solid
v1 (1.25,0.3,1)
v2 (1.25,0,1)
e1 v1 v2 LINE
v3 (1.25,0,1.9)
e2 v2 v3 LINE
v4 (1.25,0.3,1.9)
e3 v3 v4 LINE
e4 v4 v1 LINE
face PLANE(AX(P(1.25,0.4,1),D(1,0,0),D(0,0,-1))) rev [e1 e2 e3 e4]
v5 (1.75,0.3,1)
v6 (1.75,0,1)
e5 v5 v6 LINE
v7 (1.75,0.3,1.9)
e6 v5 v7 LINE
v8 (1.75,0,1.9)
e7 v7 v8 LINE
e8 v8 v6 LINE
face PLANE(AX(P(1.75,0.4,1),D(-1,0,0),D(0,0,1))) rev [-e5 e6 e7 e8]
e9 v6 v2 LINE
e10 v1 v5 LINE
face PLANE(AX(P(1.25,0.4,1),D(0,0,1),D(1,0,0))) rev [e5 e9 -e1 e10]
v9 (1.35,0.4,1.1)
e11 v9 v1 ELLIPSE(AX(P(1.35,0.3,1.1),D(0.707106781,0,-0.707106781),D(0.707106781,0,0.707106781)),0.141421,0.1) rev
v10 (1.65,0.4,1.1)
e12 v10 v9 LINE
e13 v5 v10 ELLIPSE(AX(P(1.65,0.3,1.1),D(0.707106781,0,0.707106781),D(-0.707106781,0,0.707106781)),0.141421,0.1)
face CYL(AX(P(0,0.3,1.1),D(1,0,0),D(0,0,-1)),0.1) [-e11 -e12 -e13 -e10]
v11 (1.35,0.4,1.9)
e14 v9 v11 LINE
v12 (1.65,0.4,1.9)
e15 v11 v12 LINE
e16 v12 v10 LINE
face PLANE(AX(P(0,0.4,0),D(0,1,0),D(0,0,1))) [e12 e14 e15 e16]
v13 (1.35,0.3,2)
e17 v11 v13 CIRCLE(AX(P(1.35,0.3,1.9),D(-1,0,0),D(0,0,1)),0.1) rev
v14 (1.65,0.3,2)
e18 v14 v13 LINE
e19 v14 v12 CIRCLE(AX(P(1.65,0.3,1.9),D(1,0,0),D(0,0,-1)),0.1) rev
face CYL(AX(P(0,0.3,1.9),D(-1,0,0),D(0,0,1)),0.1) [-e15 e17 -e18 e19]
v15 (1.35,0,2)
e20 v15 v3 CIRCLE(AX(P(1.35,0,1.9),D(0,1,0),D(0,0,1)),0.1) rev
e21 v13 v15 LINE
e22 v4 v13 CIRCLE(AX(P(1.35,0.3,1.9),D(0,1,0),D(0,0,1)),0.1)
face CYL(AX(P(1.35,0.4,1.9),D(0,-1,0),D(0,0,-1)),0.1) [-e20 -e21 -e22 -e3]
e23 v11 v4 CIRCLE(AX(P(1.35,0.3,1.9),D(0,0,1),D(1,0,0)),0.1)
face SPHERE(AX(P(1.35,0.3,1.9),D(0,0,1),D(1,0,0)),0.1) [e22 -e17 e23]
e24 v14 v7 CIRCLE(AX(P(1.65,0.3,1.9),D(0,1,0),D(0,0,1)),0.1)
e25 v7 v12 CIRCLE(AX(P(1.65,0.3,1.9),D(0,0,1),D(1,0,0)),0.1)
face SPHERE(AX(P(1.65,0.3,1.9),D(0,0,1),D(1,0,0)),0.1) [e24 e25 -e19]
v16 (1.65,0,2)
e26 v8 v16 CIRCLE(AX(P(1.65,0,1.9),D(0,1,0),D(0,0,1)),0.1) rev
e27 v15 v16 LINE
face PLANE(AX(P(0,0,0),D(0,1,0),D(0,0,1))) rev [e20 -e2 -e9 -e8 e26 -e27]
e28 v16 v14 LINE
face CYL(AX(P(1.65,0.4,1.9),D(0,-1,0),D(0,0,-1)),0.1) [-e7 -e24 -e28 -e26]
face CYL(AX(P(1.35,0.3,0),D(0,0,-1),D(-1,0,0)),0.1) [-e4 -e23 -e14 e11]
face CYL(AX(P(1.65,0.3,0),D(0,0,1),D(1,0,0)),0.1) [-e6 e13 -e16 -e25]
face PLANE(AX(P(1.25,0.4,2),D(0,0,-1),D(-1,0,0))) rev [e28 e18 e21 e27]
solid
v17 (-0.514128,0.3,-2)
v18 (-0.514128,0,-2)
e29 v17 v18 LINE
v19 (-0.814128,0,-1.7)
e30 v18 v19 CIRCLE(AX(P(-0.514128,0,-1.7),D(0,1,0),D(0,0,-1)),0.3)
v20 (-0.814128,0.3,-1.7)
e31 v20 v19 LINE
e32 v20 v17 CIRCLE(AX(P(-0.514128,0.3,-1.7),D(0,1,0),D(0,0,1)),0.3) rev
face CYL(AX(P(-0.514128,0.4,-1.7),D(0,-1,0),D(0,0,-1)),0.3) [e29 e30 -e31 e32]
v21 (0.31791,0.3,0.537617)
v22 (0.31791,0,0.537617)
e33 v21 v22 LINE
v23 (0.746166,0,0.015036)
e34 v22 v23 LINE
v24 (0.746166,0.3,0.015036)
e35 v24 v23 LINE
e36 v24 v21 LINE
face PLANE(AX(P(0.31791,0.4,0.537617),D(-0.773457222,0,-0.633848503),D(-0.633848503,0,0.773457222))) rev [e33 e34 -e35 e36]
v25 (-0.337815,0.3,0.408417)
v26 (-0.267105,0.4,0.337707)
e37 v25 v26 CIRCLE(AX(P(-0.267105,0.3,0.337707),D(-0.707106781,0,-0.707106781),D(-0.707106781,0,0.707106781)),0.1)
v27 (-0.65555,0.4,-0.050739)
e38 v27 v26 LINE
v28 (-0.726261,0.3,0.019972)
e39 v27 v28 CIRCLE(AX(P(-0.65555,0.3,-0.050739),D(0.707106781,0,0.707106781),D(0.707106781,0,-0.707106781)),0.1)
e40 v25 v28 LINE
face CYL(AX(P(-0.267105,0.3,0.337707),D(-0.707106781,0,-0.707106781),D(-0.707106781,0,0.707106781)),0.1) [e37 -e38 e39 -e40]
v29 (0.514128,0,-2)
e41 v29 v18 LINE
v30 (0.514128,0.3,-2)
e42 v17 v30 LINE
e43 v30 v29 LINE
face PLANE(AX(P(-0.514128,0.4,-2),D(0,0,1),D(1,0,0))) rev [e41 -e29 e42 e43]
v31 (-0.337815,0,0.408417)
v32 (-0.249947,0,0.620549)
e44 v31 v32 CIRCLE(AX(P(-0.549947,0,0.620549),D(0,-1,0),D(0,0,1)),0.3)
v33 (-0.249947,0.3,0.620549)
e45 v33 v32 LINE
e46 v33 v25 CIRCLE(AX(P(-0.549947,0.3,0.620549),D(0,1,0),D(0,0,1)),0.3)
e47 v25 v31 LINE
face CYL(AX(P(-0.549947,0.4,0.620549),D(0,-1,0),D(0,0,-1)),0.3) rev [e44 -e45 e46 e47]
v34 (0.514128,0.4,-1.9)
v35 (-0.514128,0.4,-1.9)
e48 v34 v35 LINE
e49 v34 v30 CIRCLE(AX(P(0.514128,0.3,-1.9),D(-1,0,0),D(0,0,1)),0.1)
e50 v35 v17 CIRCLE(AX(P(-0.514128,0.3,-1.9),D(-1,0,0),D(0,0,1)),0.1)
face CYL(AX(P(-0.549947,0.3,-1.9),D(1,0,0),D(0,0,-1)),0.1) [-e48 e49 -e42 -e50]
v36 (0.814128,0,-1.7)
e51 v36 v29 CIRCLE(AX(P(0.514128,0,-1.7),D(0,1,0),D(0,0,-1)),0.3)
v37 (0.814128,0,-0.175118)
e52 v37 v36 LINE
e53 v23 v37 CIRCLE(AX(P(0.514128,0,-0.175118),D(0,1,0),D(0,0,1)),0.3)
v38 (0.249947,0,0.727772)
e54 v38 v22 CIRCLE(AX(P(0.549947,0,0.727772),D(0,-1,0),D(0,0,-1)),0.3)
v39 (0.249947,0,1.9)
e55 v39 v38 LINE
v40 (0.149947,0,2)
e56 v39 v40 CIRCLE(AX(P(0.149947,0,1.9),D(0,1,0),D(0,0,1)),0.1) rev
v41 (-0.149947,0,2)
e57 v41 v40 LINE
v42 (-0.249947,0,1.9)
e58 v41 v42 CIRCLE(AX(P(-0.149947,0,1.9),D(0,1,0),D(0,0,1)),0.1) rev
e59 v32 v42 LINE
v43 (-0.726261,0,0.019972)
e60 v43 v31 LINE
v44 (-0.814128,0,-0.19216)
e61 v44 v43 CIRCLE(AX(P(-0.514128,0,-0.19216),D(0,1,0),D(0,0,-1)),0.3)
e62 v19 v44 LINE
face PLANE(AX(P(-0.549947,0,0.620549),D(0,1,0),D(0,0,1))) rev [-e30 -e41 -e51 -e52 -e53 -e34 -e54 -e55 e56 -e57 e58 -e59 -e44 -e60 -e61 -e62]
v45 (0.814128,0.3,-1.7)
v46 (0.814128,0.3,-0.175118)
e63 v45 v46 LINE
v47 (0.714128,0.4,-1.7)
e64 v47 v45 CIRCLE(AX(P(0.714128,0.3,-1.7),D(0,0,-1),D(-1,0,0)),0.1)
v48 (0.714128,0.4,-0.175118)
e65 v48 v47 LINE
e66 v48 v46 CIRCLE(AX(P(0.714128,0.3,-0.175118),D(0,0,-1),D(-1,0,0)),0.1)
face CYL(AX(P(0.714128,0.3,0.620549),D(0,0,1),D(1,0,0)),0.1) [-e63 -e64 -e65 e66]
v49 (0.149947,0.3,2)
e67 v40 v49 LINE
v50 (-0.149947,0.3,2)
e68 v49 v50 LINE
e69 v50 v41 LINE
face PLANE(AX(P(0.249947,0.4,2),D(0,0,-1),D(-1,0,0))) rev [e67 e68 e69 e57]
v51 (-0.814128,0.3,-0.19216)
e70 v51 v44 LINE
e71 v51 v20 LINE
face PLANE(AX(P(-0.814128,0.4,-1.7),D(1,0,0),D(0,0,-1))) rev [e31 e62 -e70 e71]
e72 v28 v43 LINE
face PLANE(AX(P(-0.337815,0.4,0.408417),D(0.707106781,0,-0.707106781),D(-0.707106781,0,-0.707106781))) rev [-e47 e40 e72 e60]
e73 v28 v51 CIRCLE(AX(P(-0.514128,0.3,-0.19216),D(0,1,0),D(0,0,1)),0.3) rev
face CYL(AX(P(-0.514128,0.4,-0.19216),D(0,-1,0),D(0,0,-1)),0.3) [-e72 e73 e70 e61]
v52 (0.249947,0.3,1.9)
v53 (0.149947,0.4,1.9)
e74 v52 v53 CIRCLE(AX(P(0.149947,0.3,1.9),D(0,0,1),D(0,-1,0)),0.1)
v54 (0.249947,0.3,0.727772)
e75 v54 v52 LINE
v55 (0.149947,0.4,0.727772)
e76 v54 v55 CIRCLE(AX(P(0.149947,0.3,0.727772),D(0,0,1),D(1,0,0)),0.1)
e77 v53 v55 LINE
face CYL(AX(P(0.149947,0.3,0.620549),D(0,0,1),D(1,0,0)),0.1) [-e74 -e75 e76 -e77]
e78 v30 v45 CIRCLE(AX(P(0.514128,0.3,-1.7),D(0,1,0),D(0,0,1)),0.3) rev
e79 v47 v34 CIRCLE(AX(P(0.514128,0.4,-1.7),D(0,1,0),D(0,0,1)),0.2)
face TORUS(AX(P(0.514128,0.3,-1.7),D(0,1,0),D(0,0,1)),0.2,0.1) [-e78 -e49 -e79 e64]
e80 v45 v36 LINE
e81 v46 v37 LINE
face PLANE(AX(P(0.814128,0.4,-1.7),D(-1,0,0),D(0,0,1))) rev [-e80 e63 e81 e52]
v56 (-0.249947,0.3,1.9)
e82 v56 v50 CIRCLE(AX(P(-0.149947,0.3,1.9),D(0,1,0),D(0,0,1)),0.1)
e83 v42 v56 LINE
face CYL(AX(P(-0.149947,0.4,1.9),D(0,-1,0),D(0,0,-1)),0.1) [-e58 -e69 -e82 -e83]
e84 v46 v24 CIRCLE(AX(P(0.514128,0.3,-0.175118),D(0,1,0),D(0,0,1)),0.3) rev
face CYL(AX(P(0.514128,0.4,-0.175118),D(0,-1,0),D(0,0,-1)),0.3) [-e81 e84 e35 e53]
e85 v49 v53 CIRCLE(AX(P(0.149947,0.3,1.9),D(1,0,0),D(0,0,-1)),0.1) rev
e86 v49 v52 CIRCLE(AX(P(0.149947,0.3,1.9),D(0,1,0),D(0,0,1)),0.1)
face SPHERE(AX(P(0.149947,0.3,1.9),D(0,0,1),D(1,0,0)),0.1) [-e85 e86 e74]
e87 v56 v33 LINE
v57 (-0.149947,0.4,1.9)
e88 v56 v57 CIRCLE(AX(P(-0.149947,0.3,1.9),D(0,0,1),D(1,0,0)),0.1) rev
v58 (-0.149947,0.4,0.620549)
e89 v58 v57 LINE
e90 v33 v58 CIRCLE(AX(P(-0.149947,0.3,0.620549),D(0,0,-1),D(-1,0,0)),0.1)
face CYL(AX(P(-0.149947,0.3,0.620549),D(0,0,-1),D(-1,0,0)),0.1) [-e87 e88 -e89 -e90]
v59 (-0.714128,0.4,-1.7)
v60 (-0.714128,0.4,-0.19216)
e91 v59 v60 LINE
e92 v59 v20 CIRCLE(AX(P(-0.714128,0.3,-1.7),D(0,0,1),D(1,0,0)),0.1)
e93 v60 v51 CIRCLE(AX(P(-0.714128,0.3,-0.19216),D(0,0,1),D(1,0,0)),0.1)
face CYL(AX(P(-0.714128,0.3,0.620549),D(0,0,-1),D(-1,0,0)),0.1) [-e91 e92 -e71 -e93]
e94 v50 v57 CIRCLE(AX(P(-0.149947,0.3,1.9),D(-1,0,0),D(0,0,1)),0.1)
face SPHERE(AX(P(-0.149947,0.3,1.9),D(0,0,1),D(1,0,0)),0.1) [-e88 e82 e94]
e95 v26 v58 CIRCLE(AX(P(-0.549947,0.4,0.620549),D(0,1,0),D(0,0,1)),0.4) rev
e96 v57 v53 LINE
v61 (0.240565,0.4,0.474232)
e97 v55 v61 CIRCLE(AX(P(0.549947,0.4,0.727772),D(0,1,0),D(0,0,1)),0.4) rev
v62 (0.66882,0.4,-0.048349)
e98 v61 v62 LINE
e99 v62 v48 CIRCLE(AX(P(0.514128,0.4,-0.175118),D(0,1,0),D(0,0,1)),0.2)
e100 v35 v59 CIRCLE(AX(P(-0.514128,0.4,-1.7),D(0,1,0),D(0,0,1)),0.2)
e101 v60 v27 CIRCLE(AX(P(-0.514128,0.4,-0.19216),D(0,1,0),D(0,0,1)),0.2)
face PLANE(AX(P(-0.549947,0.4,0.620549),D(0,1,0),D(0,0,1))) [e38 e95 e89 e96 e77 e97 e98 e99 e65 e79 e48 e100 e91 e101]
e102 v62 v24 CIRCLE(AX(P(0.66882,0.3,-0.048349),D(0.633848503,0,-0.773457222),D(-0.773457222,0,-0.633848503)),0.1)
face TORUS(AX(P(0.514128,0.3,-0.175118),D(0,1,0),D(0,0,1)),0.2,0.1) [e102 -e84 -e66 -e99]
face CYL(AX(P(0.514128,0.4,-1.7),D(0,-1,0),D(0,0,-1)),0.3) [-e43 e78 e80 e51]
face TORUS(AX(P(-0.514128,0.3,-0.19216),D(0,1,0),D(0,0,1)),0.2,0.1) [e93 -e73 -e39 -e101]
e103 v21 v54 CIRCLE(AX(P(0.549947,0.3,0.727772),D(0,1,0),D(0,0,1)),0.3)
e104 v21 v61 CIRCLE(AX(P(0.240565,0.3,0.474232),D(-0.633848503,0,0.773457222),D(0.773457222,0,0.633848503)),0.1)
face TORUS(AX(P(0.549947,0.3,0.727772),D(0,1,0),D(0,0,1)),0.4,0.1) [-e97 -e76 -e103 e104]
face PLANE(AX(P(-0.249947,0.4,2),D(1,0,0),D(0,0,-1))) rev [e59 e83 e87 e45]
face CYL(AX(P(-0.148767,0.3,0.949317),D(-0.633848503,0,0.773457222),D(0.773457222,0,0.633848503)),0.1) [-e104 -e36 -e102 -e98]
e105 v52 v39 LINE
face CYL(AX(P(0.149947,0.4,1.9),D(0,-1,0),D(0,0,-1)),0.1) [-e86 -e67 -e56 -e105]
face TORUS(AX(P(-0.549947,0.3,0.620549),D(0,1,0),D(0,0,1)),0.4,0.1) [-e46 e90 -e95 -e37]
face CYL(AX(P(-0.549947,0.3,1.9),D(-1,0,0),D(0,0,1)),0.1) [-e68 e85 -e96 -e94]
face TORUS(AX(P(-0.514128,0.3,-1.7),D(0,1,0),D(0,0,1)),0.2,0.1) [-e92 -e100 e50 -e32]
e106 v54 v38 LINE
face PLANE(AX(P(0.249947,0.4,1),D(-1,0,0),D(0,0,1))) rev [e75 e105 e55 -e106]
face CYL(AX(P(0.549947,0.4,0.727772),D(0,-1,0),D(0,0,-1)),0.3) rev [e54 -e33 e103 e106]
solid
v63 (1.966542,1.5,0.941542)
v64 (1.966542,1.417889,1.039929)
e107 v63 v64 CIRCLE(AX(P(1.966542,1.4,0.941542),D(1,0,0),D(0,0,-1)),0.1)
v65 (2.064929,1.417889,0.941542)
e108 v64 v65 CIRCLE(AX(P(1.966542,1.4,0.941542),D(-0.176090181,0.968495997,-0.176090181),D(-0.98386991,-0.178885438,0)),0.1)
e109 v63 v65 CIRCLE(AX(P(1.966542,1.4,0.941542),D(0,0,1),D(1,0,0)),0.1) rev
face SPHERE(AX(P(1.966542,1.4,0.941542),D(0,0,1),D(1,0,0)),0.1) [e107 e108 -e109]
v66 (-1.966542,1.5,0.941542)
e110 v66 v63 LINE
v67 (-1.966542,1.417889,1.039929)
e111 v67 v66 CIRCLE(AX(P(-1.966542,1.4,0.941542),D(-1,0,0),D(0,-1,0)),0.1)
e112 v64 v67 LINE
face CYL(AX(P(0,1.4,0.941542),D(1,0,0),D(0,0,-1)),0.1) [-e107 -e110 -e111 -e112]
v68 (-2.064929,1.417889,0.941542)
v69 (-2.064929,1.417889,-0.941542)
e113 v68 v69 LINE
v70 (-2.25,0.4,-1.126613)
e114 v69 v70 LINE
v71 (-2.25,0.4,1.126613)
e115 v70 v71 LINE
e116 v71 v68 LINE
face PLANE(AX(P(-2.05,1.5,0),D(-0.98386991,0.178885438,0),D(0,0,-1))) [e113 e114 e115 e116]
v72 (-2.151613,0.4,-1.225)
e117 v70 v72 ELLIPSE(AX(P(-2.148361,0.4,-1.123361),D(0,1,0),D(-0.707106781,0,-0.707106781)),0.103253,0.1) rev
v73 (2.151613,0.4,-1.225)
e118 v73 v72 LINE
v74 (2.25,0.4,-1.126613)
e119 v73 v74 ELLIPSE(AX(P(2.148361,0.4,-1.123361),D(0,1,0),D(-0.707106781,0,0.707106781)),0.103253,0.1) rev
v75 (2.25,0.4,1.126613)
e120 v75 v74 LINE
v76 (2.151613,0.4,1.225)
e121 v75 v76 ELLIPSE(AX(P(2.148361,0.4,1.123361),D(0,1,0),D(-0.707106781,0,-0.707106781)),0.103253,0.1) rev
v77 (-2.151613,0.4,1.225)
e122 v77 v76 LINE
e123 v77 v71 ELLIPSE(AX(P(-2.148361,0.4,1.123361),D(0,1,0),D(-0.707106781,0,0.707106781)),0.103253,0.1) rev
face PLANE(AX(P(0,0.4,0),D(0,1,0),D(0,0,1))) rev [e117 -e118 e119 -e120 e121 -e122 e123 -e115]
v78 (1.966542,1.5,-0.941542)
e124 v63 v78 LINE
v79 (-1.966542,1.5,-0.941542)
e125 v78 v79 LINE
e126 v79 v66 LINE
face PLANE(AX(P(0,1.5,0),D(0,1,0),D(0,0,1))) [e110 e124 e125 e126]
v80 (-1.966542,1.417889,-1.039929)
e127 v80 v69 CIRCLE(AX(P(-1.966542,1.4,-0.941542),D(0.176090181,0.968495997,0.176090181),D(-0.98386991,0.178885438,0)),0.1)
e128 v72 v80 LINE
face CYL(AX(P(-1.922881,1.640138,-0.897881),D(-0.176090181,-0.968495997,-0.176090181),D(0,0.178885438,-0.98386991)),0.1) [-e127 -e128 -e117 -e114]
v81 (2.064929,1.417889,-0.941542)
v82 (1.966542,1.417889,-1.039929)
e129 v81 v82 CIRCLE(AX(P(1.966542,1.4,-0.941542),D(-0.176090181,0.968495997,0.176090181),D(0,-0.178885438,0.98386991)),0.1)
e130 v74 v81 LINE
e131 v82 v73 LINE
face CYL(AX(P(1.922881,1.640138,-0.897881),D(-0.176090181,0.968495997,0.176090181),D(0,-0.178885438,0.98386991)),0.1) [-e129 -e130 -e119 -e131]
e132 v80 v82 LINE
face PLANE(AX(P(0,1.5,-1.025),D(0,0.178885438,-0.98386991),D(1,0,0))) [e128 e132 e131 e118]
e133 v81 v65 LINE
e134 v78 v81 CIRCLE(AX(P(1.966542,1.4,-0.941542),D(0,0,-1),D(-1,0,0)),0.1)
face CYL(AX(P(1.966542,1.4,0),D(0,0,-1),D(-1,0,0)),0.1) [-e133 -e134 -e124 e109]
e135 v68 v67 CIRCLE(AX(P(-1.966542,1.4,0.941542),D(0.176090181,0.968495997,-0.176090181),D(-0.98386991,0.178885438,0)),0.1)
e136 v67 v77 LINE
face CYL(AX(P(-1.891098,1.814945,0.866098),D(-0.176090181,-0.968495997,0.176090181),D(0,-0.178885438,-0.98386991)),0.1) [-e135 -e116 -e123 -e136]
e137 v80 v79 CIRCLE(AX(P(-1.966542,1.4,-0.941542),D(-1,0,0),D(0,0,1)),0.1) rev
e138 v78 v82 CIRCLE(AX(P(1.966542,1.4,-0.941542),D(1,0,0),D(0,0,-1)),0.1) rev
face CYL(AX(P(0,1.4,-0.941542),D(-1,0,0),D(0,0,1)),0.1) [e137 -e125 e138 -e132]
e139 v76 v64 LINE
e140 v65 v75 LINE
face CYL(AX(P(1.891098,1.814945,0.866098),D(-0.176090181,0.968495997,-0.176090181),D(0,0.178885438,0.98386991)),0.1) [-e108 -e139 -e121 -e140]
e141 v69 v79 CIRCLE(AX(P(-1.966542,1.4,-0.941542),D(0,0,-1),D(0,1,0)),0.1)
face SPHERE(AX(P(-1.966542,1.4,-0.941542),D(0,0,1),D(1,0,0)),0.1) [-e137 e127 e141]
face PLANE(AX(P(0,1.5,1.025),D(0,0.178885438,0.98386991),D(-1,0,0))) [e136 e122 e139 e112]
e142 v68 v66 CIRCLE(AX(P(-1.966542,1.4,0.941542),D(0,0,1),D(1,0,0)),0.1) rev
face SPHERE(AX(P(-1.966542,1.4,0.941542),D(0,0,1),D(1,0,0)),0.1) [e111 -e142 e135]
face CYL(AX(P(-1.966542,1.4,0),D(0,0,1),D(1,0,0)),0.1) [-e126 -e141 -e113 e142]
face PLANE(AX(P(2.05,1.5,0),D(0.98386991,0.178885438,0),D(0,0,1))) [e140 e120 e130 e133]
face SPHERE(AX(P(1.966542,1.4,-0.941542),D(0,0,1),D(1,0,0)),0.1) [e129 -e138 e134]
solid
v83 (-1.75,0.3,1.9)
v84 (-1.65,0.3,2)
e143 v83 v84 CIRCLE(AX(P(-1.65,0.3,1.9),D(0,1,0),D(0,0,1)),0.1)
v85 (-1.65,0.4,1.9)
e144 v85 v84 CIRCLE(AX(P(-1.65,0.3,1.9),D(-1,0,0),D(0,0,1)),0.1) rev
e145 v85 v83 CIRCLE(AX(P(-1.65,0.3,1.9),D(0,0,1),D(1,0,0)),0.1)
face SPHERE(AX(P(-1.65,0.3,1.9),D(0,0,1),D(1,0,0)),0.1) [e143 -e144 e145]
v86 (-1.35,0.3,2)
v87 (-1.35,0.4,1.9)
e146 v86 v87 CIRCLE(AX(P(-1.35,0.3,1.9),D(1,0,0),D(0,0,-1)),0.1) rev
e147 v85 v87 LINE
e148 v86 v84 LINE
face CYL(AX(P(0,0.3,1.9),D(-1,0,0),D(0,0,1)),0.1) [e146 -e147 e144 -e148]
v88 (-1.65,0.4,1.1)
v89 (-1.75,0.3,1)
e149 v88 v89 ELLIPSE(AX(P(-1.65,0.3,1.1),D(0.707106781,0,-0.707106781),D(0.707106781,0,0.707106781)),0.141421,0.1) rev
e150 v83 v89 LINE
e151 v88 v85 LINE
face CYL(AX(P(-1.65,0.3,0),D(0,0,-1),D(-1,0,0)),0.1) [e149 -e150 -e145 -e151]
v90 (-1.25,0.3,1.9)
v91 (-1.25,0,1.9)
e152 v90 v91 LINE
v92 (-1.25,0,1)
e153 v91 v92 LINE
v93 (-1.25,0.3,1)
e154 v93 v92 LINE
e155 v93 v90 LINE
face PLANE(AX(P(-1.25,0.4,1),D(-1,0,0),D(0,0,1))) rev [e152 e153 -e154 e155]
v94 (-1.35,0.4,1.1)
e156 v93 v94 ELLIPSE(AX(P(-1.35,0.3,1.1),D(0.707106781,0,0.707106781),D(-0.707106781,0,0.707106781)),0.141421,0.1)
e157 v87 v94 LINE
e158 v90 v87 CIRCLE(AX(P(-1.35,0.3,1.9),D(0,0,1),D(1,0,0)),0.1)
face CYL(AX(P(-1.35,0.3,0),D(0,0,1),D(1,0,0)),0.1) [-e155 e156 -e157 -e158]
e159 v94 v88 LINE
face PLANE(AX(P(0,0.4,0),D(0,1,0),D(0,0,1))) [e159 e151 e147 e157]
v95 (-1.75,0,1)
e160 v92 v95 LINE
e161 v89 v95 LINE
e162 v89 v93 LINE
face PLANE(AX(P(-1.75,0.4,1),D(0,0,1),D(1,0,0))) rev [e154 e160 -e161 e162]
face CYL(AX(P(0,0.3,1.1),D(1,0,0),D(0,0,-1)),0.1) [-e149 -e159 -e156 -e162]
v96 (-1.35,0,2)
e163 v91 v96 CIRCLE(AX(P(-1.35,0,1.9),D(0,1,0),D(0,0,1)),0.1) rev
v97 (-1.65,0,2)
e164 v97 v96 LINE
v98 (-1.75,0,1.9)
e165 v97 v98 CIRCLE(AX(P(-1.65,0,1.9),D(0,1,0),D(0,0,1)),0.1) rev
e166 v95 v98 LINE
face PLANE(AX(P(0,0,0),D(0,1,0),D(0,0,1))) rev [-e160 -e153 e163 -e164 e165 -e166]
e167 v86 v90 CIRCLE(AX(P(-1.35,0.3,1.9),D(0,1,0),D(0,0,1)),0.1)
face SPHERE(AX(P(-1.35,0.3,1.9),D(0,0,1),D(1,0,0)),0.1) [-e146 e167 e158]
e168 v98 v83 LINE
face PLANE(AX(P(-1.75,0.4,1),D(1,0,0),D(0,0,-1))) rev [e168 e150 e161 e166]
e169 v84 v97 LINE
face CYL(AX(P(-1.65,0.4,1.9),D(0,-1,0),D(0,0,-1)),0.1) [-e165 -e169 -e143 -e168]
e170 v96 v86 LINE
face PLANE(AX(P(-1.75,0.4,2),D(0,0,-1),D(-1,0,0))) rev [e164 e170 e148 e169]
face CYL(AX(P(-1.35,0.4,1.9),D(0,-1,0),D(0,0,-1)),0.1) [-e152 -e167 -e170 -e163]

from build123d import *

# Parameters (mm, degrees)
EXTRUDE_1_DEPTH   = 0.4
SKETCH_1_W        = 0.5
SKETCH_1_H        = 1
EXTRUDE_1_2_DEPTH = 0.4
EXTRUDE_1_3_DEPTH = 0.4
FILLET_1_R        = 0.1
FILLET_2_R        = 0.1
FILLET_3_R        = 0.1
SKETCH_2_W        = 4.5
SKETCH_2_H        = 2.45
EXTRUDE_2_DEPTH   = 1.1
CHAMFER_1_SIZE    = 1.1
CHAMFER_1_SIZE_2  = 0.2
FILLET_4_R        = 0.1


with BuildPart() as part:
    # Эскиз1 → Бобышка-Вытянуть1 (new body)
    with BuildSketch(Plane(origin=(0, 0, 0), x_dir=(1, 0, 0), z_dir=(0, 1, 0))):
        with BuildLine():
            Line((-0.249947437, -1), (-0.249947437, -0.62054925))
            ThreePointArc((-0.249947437, -0.62054925), (-0.272783577, -0.50574422), (-0.337815403, -0.408417215))
            Line((-0.337815403, -0.408417215), (-0.726260523, -0.019972095))
            ThreePointArc((-0.726260523, -0.019972095), (-0.791292348, 0.077354909), (-0.814128489, 0.192159939))
            Line((-0.814128489, 0.192159939), (-0.814128489, 1.7))
            ThreePointArc((-0.814128489, 1.7), (-0.726260523, 1.912132034), (-0.514128489, 2))
            Line((-0.514128489, 2), (0.514128489, 2))
            ThreePointArc((0.514128489, 2), (0.726260523, 1.912132034), (0.814128489, 1.7))
            Line((0.814128489, 1.7), (0.814128489, 0.17511839))
            ThreePointArc((0.814128489, 0.17511839), (0.796627294, 0.074150944), (0.746165655, -0.015036161))
            Line((0.746165655, -0.015036161), (0.31791027, -0.537617218))
            ThreePointArc((0.31791027, -0.537617218), (0.267448632, -0.626804324), (0.249947437, -0.727771769))
            Line((0.249947437, -0.727771769), (0.249947437, -1))
            Line((0.249947437, -1), (0.249947437, -2))
            Line((0.249947437, -2), (-0.249947437, -2))
            Line((-0.249947437, -2), (-0.249947437, -1))
        make_face()
    extrude(amount=EXTRUDE_1_DEPTH)

    # Скругление1
    fillet_1_edges = [part.edges().sort_by_distance(p)[0] for p in [
        (0, 0.4, 2),
        (0.249947437, 0.4, 1.363885884),
        (0.267448632, 0.4, 0.626804324),
        (0.532037963, 0.4, 0.27632669),
        (0.249947437, 0.2, 2),
        (-0.249947437, 0.2, 2),
        (0.796627294, 0.4, -0.074150944),
        (0.814128489, 0.4, -0.937559195),
        (0.726260523, 0.4, -1.912132034),
        (0, 0.4, -2),
        (-0.272783577, 0.4, 0.50574422),
        (-0.726260523, 0.4, -1.912132034),
        (-0.814128489, 0.4, -0.94607997),
        (-0.791292348, 0.4, -0.077354909),
        (-0.532037963, 0.4, 0.214194655),
        (-0.249947437, 0.4, 1.310274625),
    ]]
    fillet(fillet_1_edges, radius=FILLET_1_R)


with BuildPart() as body_2:
    # Эскиз1 → Extrude 1 2 (new body)
    with BuildSketch(Plane(origin=(0, 0, 0), x_dir=(1, 0, 0), z_dir=(0, 1, 0))):
        with Locations((-1.5, -1.5)):
            Rectangle(SKETCH_1_W, SKETCH_1_H)
    extrude(amount=EXTRUDE_1_2_DEPTH)

    # Скругление2
    fillet_2_edges = [body_2.edges().sort_by_distance(p)[0] for p in [
        (-1.75, 0.4, 1.5),
        (-1.5, 0.4, 2),
        (-1.25, 0.4, 1.5),
        (-1.5, 0.4, 1),
        (-1.25, 0.2, 2),
        (-1.75, 0.2, 2),
    ]]
    fillet(fillet_2_edges, radius=FILLET_2_R)


with BuildPart() as body_3:
    # Эскиз1 → Extrude 1 3 (new body)
    with BuildSketch(Plane(origin=(0, 0, 0), x_dir=(1, 0, 0), z_dir=(0, 1, 0))):
        with Locations((1.5, -1.5)):
            Rectangle(SKETCH_1_W, SKETCH_1_H)
    extrude(amount=EXTRUDE_1_3_DEPTH)

    # Скругление3
    fillet_3_edges = [body_3.edges().sort_by_distance(p)[0] for p in [
        (1.25, 0.4, 1.5),
        (1.5, 0.4, 2),
        (1.75, 0.4, 1.5),
        (1.5, 0.4, 1),
        (1.75, 0.2, 2),
        (1.25, 0.2, 2),
    ]]
    fillet(fillet_3_edges, radius=FILLET_3_R)


with BuildPart() as body_4:
    # Эскиз2 → Бобышка-Вытянуть2 (new body)
    with BuildSketch(Plane(origin=(0, 0.4, 0), x_dir=(1, 0, 0), z_dir=(0, 1, 0))):
        Rectangle(SKETCH_2_W, SKETCH_2_H)
    extrude(amount=EXTRUDE_2_DEPTH)

    # Фаска1
    # the kernel refuses this chamfer: 1.1, 0.2 mm, written as the material it takes off along each edge
    with BuildSketch(Plane(origin=(5.108293424, 1.5, 1.225), x_dir=(0, -0.9999763028084744, 0.006884317068103953), z_dir=(-1, 0, 0)), Plane(origin=(-5.108293424, 1.5, -1.225), x_dir=(0, -0.9999763028084744, -0.006884317068103953), z_dir=(1, 0, 0))) as chamfer_1_piece_1:
        Polygon((CHAMFER_1_SIZE * 0.999976302808, -CHAMFER_1_SIZE * 0.0068843170681), (-CHAMFER_1_SIZE_2 * 0.0068843170681, -CHAMFER_1_SIZE_2 * 0.999976302808), (0, 0), align=None)
    extrude(amount=10.216586847, mode=Mode.SUBTRACT)
    with BuildSketch(Plane(origin=(-2.25, 1.5, 4.083293424), x_dir=(-0.006884317068103953, -0.9999763028084744, 0), z_dir=(0, 0, -1)), Plane(origin=(2.25, 1.5, -4.083293424), x_dir=(0.006884317068103953, -0.9999763028084744, 0), z_dir=(0, 0, 1))) as chamfer_1_piece_2:
        Polygon((CHAMFER_1_SIZE * 0.999976302808, -CHAMFER_1_SIZE * 0.0068843170681), (-CHAMFER_1_SIZE_2 * 0.0068843170681, -CHAMFER_1_SIZE_2 * 0.999976302808), (0, 0), align=None)
    extrude(amount=8.166586847, mode=Mode.SUBTRACT)

    # Скругление4
    fillet_4_edges = [body_4.edges().sort_by_distance(p)[0] for p in [
        (2.05, 1.5, 0),
        (0, 1.5, -1.025),
        (-2.05, 1.5, 0),
        (0, 1.5, 1.025),
        (-2.15, 0.95, -1.125),
        (2.15, 0.95, -1.125),
        (-2.15, 0.95, 1.125),
        (2.15, 0.95, 1.125),
    ]]
    fillet(fillet_4_edges, radius=FILLET_4_R)


solid = Compound([part.part, body_2.part, body_3.part, body_4.part])
